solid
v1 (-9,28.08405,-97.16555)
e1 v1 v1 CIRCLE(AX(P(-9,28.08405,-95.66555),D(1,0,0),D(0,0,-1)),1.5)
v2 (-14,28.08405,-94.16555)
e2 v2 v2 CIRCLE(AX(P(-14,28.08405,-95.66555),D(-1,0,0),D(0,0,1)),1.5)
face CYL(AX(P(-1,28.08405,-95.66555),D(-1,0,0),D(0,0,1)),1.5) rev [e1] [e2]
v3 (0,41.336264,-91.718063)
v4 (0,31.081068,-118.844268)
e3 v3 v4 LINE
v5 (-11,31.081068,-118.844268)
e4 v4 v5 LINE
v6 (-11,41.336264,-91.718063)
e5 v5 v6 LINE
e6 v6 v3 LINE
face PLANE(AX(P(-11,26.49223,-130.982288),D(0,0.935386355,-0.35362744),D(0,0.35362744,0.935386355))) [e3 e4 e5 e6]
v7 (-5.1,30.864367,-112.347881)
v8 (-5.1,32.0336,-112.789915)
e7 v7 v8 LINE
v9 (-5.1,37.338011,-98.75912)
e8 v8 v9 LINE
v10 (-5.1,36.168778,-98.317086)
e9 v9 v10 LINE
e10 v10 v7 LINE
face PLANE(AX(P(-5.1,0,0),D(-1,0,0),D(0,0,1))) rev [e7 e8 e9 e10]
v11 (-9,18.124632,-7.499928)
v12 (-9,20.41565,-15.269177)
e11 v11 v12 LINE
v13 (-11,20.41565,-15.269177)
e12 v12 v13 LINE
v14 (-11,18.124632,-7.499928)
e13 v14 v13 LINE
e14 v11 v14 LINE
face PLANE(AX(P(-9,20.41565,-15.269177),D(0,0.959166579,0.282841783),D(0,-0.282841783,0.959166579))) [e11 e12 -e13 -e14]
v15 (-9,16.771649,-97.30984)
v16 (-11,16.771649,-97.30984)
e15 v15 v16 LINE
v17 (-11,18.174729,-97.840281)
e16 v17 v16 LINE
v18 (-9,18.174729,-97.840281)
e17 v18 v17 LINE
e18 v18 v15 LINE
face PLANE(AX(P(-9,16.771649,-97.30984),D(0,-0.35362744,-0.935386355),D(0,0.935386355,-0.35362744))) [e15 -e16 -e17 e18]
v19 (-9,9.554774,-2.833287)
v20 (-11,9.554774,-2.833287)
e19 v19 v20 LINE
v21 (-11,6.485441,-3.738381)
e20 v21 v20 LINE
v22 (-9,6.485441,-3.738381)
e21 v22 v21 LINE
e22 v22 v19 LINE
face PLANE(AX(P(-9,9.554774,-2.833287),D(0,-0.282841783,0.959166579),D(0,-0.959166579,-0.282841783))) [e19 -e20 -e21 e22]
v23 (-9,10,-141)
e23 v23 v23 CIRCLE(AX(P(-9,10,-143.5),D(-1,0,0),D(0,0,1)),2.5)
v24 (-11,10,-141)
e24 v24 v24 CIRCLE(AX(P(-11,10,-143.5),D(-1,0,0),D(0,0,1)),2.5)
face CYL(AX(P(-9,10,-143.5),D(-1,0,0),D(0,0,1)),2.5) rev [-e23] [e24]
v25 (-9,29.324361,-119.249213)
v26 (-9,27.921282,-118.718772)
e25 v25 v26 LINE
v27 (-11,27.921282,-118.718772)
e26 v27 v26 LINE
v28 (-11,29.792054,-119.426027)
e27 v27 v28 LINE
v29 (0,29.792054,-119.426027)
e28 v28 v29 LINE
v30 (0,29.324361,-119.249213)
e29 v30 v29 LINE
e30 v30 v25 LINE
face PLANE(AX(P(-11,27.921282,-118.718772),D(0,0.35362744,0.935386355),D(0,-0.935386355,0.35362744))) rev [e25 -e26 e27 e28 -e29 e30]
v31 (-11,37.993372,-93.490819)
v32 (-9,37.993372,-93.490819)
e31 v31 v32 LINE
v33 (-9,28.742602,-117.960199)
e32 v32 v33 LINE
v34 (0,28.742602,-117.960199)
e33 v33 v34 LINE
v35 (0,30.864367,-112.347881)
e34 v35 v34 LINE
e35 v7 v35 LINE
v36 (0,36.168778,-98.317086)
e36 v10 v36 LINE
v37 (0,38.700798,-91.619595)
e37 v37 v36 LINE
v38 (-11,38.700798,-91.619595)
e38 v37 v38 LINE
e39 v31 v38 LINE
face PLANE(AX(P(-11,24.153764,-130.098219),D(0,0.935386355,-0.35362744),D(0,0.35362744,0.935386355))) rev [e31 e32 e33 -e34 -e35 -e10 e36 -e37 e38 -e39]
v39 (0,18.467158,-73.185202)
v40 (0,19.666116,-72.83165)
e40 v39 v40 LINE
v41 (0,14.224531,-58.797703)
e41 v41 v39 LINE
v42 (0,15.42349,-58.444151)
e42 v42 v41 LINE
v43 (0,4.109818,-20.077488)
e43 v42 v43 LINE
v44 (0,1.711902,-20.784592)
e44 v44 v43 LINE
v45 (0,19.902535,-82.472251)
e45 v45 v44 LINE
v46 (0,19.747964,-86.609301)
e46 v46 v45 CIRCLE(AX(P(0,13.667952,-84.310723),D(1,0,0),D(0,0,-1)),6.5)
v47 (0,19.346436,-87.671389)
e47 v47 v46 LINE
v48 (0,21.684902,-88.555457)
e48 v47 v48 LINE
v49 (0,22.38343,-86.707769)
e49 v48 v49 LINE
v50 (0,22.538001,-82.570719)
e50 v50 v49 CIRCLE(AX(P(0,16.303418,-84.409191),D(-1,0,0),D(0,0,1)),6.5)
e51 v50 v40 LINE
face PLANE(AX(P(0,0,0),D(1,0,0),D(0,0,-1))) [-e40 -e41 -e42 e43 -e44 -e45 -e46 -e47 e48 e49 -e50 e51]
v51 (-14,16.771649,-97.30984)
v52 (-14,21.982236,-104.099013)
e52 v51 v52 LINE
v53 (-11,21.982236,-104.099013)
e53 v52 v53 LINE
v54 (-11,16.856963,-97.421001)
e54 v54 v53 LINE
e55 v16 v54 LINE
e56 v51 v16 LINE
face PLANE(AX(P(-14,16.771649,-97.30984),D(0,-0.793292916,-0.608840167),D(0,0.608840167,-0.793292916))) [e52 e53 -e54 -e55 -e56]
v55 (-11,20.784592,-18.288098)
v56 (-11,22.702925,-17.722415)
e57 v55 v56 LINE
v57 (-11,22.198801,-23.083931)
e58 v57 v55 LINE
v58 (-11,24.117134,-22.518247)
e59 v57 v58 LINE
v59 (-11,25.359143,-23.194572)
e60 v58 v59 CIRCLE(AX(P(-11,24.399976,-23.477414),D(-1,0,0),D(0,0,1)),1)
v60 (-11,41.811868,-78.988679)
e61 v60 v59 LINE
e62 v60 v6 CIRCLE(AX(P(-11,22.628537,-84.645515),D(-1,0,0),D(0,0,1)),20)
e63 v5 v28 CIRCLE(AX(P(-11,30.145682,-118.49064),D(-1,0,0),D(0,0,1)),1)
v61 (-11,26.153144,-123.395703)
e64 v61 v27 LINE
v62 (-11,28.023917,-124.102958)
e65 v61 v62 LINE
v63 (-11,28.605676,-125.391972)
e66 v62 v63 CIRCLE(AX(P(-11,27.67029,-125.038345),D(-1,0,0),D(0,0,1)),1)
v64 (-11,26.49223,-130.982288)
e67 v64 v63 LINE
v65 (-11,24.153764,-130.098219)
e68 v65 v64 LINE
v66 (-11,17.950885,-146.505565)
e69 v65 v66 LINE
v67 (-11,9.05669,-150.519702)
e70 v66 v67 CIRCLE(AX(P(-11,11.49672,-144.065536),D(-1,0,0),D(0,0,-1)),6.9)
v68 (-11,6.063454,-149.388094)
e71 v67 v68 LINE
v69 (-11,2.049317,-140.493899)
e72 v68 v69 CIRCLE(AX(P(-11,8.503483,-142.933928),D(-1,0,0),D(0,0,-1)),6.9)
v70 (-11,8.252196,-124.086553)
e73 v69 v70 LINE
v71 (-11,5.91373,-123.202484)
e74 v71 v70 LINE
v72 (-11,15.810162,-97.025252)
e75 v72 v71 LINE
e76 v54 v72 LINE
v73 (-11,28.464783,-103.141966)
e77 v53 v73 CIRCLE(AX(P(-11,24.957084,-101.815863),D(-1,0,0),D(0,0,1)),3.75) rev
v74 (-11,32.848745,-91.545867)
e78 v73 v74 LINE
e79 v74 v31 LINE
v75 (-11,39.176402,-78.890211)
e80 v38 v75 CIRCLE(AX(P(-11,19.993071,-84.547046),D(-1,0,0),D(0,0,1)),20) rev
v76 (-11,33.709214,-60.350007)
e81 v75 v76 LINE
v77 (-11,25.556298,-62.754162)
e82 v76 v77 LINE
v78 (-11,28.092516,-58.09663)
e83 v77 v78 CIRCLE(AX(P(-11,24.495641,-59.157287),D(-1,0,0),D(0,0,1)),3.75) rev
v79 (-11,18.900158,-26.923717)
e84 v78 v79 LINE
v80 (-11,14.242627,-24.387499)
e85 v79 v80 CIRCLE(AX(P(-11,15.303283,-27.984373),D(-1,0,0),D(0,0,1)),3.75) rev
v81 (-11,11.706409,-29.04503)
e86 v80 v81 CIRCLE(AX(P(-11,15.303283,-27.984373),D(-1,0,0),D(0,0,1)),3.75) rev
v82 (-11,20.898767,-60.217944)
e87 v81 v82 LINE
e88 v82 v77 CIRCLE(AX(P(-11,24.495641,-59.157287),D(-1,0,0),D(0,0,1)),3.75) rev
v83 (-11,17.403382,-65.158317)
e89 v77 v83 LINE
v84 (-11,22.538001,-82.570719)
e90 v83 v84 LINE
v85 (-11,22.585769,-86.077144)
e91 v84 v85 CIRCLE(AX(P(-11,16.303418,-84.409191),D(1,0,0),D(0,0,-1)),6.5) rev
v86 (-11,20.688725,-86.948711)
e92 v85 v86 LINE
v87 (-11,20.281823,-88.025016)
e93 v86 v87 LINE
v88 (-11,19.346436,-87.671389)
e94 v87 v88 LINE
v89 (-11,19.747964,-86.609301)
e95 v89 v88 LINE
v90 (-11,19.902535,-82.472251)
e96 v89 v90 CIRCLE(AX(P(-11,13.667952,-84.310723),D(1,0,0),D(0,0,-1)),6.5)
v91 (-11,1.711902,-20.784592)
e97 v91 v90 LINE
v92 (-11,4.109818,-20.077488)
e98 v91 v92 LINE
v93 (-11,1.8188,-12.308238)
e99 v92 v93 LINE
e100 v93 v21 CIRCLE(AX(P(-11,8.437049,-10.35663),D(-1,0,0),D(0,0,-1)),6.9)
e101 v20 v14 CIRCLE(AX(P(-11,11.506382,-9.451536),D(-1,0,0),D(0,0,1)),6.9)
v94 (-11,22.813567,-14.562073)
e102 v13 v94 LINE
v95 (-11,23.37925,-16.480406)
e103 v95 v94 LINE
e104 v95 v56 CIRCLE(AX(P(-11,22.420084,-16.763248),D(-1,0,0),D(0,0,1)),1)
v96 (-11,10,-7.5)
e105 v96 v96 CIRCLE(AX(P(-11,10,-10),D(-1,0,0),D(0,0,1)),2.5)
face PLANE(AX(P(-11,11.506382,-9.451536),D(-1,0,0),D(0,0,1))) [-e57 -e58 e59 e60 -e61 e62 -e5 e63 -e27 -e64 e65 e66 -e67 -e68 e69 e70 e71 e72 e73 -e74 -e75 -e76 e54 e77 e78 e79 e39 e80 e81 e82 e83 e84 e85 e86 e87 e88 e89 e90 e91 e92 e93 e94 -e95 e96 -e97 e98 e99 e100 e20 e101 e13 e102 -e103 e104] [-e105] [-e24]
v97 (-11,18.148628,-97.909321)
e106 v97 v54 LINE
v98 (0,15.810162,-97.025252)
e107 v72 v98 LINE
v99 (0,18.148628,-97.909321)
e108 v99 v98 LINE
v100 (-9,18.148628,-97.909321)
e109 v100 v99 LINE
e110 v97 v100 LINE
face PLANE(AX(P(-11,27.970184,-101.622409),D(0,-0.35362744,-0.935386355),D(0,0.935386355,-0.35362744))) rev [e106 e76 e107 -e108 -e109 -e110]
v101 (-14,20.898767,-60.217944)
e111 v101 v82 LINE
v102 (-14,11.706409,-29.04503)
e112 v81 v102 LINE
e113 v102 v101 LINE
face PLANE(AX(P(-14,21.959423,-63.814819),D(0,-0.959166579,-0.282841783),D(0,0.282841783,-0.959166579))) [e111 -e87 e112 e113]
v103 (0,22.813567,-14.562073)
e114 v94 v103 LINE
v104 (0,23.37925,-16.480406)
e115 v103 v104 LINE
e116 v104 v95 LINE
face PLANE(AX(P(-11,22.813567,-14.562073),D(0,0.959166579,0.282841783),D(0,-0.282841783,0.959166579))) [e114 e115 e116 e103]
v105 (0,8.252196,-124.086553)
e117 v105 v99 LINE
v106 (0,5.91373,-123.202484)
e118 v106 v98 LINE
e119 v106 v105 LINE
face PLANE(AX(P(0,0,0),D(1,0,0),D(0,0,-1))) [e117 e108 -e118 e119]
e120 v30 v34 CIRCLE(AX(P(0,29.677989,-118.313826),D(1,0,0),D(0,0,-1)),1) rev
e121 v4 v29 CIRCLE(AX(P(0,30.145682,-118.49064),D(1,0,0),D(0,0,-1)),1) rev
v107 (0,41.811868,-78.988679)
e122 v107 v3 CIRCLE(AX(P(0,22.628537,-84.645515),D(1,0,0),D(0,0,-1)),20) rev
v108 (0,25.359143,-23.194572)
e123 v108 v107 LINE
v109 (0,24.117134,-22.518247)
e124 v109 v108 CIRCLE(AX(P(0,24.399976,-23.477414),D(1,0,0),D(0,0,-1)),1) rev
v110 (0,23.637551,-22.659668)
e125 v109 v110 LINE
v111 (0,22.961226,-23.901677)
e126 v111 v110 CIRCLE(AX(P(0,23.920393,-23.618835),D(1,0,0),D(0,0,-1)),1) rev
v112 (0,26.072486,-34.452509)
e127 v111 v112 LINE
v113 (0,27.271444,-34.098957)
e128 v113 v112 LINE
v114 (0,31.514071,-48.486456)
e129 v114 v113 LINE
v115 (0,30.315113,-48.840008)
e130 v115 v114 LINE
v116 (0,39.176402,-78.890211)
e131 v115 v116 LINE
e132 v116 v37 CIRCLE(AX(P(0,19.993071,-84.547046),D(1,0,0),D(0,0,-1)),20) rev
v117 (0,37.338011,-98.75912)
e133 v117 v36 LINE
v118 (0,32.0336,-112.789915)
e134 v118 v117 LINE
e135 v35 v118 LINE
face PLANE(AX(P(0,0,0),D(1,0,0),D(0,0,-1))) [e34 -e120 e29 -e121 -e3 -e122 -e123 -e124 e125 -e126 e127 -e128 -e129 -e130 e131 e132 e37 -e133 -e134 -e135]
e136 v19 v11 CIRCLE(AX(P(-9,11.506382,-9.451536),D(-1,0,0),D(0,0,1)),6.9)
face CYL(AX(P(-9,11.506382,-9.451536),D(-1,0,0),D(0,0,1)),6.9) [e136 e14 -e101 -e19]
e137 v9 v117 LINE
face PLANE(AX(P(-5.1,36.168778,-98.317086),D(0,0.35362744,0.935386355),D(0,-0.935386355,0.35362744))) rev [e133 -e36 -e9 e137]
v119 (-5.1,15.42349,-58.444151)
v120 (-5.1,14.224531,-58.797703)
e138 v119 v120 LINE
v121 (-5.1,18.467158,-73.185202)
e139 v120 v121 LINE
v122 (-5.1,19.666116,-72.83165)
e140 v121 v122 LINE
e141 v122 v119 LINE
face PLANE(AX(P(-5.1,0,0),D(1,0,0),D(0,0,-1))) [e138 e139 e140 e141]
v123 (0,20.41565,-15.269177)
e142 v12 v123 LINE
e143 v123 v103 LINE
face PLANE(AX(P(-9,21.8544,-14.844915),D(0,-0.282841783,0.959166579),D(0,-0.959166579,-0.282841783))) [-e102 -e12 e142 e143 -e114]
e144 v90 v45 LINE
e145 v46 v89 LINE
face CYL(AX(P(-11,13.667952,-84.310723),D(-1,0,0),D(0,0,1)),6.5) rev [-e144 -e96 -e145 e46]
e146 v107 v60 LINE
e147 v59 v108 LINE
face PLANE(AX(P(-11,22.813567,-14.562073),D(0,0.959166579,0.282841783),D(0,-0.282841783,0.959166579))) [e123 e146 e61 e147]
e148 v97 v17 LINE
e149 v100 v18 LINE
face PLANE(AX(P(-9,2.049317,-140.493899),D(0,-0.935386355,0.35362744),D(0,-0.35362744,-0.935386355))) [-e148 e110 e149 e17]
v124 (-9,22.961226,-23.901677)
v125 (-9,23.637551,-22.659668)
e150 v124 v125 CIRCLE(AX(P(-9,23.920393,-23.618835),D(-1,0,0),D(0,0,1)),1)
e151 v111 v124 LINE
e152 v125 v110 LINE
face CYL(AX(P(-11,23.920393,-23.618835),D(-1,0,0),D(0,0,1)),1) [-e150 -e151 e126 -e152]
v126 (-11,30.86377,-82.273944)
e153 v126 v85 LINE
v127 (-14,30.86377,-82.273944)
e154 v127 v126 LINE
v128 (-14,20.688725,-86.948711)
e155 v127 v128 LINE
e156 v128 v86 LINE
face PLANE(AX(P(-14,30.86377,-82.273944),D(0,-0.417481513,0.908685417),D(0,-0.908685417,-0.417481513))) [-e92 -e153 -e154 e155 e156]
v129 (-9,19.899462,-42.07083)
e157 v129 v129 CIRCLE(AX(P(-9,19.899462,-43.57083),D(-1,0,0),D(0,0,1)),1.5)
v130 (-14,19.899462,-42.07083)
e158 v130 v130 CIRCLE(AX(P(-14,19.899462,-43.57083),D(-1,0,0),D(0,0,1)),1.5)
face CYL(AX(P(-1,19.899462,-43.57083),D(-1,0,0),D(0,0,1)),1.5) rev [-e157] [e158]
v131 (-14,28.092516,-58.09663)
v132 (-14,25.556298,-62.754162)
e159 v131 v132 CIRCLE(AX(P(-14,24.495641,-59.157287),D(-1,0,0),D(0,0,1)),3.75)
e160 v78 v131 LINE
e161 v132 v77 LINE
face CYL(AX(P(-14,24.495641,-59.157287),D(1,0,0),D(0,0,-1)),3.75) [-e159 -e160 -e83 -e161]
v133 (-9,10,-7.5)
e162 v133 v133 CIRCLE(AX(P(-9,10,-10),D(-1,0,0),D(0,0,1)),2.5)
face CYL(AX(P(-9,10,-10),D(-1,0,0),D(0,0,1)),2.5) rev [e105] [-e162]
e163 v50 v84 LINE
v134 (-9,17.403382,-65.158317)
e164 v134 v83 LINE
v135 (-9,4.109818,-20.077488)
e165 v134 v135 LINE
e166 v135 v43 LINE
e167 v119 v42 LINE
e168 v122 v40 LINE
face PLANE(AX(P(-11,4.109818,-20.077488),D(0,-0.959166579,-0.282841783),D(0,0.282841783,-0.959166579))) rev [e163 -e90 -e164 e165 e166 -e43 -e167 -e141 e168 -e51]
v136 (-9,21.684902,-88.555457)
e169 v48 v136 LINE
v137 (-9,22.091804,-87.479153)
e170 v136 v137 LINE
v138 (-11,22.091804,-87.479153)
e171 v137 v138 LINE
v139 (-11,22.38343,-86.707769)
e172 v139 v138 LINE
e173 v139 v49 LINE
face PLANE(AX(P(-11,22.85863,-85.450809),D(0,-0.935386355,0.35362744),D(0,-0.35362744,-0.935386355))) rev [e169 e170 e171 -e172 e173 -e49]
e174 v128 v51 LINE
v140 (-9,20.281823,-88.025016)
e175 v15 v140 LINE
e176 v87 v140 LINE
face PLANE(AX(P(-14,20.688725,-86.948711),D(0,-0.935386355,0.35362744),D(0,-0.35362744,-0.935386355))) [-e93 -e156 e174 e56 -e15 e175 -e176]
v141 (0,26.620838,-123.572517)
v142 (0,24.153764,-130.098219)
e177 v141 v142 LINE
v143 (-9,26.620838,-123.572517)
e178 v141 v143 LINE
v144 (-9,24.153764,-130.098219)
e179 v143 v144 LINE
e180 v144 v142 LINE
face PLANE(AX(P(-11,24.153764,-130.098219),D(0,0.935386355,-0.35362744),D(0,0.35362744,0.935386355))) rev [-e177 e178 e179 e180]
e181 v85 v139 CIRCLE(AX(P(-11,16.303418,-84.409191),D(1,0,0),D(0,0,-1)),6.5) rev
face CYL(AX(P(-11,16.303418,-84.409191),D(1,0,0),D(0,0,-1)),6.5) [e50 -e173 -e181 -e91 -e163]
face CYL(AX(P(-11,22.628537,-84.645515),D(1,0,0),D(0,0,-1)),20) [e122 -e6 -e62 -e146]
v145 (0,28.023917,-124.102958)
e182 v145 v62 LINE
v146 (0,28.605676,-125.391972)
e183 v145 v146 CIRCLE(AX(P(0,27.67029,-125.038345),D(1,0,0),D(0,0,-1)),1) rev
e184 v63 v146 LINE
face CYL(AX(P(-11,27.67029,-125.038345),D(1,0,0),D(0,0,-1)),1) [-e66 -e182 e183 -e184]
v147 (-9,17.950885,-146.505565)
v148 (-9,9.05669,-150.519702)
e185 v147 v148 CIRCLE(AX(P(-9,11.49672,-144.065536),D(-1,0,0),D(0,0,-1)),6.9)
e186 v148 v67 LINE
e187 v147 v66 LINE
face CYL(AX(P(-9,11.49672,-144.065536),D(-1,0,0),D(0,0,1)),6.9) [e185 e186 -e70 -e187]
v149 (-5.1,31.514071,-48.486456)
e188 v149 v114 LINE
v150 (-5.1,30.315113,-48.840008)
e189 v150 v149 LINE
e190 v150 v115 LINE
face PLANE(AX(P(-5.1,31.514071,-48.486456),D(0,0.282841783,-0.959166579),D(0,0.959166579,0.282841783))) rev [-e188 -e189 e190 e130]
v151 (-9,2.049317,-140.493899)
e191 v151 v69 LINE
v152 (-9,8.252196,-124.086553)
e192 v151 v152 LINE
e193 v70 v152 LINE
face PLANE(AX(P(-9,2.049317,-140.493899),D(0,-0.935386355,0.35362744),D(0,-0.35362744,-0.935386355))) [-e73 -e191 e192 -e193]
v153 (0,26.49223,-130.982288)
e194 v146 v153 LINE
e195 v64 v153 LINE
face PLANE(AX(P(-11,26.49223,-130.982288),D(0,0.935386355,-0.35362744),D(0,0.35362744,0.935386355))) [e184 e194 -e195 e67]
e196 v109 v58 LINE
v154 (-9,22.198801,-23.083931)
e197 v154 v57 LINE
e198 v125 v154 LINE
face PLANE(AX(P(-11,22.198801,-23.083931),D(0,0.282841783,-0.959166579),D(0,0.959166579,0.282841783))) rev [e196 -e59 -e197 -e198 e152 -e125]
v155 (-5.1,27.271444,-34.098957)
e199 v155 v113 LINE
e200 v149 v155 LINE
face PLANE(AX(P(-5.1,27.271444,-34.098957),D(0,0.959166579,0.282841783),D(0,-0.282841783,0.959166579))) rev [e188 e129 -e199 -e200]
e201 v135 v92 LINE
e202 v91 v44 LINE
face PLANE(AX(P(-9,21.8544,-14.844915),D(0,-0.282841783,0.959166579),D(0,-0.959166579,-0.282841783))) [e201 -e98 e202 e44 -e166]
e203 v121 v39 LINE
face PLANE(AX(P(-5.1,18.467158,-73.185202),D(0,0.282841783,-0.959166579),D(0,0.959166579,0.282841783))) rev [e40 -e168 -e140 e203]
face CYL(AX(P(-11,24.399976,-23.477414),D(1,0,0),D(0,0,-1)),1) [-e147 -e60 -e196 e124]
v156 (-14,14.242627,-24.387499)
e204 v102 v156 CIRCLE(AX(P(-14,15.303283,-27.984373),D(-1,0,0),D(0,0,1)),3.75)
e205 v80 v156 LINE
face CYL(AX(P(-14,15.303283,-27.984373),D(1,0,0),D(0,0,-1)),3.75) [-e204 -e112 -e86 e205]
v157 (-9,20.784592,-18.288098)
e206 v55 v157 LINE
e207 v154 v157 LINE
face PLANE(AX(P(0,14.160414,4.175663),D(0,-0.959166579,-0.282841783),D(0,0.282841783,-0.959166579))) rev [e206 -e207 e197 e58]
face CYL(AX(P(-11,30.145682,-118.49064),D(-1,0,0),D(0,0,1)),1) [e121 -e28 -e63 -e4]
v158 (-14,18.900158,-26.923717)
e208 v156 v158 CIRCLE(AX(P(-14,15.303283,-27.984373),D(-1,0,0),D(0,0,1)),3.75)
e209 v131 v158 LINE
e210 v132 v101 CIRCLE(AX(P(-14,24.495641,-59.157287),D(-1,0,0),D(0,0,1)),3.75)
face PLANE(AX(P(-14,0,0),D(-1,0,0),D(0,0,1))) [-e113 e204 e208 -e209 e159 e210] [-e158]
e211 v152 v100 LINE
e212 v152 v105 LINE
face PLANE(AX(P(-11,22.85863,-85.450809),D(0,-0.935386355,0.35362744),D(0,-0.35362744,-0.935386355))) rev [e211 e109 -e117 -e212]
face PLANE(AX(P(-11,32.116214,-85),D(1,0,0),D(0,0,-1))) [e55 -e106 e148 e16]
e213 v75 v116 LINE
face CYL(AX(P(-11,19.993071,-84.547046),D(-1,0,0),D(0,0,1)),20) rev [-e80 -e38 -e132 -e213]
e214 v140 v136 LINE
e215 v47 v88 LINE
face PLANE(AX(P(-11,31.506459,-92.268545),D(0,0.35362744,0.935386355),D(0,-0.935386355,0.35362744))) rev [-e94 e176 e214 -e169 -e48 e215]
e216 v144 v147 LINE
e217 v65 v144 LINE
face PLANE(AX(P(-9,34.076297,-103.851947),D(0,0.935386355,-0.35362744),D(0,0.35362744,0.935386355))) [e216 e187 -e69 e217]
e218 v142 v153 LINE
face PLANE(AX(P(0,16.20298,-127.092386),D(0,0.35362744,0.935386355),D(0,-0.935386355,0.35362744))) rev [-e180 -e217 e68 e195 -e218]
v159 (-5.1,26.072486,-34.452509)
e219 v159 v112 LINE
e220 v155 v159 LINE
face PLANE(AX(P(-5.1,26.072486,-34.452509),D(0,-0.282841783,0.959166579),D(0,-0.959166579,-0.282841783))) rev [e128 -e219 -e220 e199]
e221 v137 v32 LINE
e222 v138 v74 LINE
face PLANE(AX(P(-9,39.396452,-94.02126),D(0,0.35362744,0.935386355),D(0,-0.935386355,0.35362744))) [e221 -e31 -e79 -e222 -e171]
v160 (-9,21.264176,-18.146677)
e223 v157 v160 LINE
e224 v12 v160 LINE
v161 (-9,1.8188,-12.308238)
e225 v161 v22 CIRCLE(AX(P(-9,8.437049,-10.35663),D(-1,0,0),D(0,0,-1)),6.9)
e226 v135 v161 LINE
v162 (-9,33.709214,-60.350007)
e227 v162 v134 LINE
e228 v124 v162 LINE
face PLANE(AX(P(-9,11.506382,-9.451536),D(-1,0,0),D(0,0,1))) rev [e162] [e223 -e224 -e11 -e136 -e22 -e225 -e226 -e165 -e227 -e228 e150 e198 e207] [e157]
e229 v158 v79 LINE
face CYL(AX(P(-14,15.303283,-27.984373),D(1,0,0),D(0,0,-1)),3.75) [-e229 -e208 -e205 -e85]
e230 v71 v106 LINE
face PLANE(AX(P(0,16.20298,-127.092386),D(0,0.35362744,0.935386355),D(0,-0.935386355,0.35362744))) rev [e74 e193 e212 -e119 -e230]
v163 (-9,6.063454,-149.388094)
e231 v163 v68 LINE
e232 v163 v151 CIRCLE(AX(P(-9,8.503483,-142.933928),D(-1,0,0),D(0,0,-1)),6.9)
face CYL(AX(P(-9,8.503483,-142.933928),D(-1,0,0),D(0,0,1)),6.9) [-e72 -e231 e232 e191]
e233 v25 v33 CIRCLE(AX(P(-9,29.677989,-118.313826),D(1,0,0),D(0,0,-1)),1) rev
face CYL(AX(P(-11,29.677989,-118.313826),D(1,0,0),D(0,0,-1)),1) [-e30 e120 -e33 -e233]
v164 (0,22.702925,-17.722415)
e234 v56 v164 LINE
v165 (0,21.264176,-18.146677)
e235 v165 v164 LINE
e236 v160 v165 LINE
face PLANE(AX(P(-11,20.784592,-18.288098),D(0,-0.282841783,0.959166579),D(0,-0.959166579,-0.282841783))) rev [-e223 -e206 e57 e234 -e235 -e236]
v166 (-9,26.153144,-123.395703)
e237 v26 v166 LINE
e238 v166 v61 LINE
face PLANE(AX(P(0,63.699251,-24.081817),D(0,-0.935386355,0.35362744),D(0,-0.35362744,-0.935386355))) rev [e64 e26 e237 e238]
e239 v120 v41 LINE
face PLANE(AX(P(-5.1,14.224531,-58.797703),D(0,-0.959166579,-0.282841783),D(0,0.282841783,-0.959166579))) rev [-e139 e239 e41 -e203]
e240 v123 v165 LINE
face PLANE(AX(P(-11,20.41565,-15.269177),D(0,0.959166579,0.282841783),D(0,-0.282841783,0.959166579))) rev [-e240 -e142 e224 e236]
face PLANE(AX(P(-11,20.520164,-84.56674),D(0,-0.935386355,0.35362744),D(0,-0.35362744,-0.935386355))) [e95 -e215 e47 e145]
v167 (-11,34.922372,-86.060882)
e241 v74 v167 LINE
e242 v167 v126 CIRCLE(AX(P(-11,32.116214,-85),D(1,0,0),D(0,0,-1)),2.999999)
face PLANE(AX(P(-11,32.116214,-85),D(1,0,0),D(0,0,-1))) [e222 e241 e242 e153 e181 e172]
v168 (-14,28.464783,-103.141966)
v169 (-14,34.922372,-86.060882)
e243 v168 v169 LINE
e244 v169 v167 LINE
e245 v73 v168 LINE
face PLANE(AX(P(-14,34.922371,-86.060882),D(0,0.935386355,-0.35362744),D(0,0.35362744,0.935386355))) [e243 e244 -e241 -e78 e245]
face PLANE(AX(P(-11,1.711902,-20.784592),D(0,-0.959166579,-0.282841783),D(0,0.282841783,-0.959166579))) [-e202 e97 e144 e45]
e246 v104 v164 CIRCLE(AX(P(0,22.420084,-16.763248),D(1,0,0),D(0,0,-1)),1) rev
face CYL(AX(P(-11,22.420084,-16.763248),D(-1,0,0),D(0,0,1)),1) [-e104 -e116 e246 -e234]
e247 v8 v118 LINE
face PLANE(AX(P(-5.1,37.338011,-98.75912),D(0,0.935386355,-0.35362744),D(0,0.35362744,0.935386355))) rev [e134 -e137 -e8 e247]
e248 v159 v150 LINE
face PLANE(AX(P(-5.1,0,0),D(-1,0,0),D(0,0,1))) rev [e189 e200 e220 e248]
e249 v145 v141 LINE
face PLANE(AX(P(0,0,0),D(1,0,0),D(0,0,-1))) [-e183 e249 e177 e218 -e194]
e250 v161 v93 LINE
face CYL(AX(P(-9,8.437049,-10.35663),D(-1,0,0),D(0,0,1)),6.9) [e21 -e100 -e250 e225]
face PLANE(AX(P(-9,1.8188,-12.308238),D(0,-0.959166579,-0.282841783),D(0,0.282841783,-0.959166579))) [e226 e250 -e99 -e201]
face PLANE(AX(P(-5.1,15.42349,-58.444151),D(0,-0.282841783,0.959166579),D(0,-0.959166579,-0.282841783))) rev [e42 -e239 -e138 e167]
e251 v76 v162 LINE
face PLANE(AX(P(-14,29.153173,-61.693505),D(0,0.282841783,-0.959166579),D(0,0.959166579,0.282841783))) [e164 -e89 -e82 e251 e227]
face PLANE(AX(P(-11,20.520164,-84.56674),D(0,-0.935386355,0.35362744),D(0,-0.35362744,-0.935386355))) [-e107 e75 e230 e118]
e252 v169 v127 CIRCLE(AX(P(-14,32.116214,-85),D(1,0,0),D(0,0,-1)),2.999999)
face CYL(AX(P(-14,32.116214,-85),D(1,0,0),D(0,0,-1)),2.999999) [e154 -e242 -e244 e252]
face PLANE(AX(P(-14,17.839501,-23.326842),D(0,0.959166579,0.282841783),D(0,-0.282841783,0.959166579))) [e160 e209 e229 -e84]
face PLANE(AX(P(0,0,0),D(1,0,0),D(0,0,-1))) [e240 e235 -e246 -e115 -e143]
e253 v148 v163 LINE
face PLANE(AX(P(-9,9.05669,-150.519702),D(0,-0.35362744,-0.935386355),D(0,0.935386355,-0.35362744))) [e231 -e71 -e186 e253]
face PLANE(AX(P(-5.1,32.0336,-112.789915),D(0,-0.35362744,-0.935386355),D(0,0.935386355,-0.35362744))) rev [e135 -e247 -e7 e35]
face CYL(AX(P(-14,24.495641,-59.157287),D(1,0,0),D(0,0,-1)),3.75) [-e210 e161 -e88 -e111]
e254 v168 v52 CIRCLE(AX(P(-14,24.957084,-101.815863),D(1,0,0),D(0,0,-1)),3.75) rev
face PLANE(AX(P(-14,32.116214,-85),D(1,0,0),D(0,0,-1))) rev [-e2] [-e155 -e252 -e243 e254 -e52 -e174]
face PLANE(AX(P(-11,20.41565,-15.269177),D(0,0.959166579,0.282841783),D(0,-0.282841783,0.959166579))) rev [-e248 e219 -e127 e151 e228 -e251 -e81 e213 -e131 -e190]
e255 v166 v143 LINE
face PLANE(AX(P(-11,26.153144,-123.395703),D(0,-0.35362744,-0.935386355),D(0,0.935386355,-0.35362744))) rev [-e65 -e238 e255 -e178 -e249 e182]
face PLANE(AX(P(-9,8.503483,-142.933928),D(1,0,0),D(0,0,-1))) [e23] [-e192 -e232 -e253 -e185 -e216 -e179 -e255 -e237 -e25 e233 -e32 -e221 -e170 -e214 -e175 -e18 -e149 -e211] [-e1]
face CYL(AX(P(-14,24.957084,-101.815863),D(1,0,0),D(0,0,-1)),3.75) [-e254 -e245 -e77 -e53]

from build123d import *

# Parameters (mm, degrees)
SWEEP1_PROFILE_R        = 11
CUT_EXTRUDE1_DEPTH      = 139.5211963076765
CUT_EXTRUDE1_DEPTH_BACK = 139.5211963076765
BOSS_EXTRUDE1_DEPTH     = 11
BOSS_EXTRUDE4_DEPTH     = 11
SHELL1_START            = -11
SHELL1_DEPTH            = 11
SHELL1_START_2          = -113.150665538
SHELL1_2_DEPTH          = 47.855548818
SHELL1_START_3          = 20.420083618
SHELL1_3_DEPTH          = 73.048431747
FILLET1_R               = 6.5
BOSS_EXTRUDE2_DEPTH     = 3
CUT_EXTRUDE2_DEPTH      = 13.000000000000002
SKETCH21_R              = 2.499999999999935
SKETCH21_R_2            = 2.499999999999995
BOSS_EXTRUDE3_DEPTH     = 2
SKETCH22_R              = 1.4999999999999973
SKETCH22_R_2            = 1.5000000000000042
CUT_EXTRUDE3_DEPTH      = 13.000000000000002
FILLET2_R               = 3.75
CUT_EXTRUDE4_DEPTH      = 3
FILLET3_R               = 20
CUT_EXTRUDE5_DEPTH      = 3
FILLET4_R               = 1
CUT_EXTRUDE6_DEPTH      = 158.49217492446147
CUT_EXTRUDE7_DEPTH      = 5.1


with BuildPart() as part:
    # Sweep1: sweep along a path in Sketch6
    with BuildLine(Plane(origin=(0, 0, 0), x_dir=(0, 0, -1), z_dir=(1, 0, 0))) as sweep1_path:
        Line((17.67333262983066, 12.262734264551655), (84.99999999999999, 32.11621443102775))
        Line((84.99999999999999, 32.11621443102775), (127.09238599616681, 16.202979651458282))
    # Sweep1 profile (on start of the path) → Sweep1 (sweep)
    with BuildSketch(Plane(origin=(0, 12.262734264551655, -17.67333262983066), x_dir=(0, -0.9591665787285488, -0.28284178306991825), z_dir=(0, 0.28284178306991825, -0.9591665787285488))):
        Circle(SWEEP1_PROFILE_R)
    sweep(path=sweep1_path.line, transition=Transition.RIGHT)

    # Sketch13 → Cut-Extrude1 (cut, two sides: drawn at the far end of the back side and taken through both)
    with BuildSketch(Plane(origin=(0, 0, 0), x_dir=(1, 0, 0), z_dir=(0, 1, 0)).offset(-CUT_EXTRUDE1_DEPTH_BACK)):
        Polygon((-1.735e-14, 141.7207506217034), (-10.000000000000018, 141.7207506217034), (-10, -2.41e-15), (0, -1.18e-15), align=None)
    extrude(amount=CUT_EXTRUDE1_DEPTH + CUT_EXTRUDE1_DEPTH_BACK, mode=Mode.SUBTRACT)


with BuildPart() as cut_extrude1_piece_1:
    # of the separate pieces the step leaves, piece 1, a body of its own (cut_extrude1_pieces)
    add(part.part.solids().sort_by_distance((0, 22.813566631, -14.562073016))[0])



with BuildPart() as cut_extrude1_piece_2:
    # of the separate pieces the step leaves, piece 2, a body of its own (cut_extrude1_pieces)
    add(part.part.solids().sort_by_distance((-10, 7.867280813, -18.96947651))[0])


with BuildPart() as cut_extrude1_piece_1_1:
    add(cut_extrude1_piece_1.part)

    add(cut_extrude1_piece_2.part)  # Boss-Extrude1 merges Cut-Extrude1 piece 2
    # Sketch17 → Boss-Extrude1 (add)
    with BuildSketch(Plane(origin=(0, 0, 0), x_dir=(0, 0, -1), z_dir=(1, 0, 0))):
        Polygon((14.562073016061587, 22.813566630565735), (85.43326002077312, 43.71226488094253), (130.98228783117273, 26.4922295616324), (123.20248416116098, 5.91372974128417), (84.56673997922682, 20.52016398111302), (20.78459224359979, 1.7119018985376593), align=None)
    extrude(amount=-BOSS_EXTRUDE1_DEPTH)

    # Sketch24 → Boss-Extrude4 (add)
    with BuildSketch(Plane(origin=(0, 0, 0), x_dir=(0, 0, -1), z_dir=(1, 0, 0))):
        Polygon((127.09238599616687, 16.20297965145829), (84.99999999999997, 32.11621443102777), (17.673332629830696, 12.2627342645517), (14.5620730160616, 22.813566630565738), (85.43326002077312, 43.71226488094253), (130.98228783117273, 26.4922295616324), align=None)
    extrude(amount=BOSS_EXTRUDE4_DEPTH)

    # Shell1: read off the stored shape, not the designer's step
    # Shell1 outline → Shell1 (cut)
    with BuildSketch(Plane.YZ.offset(SHELL1_START)):
        Polygon((4.109818345, -20.077487786), (23.155629992, -84.665208166), (8.25219563, -124.08655276), (24.153763673, -130.098219232), (41.07679887, -85.334791834), (20.415650184, -15.269177474), align=None)
    extrude(amount=SHELL1_DEPTH, mode=Mode.SUBTRACT)

    # Shell1 2 outline → Shell1 2 (cut)
    with BuildSketch(Plane(origin=(0, 0, 0), x_dir=(1, 0, 0), z_dir=(0, 0.353627439545988, 0.935386355470374)).offset(SHELL1_START_2)):
        with BuildLine():
            ThreePointArc((0, 51.59940113), (6.01040764, 54.088993489), (8.5, 60.09940113))
            Line((8.5, 60.09940113), (8.5, 68.59940113))
            Line((8.5, 68.59940113), (0, 68.59940113))
            Line((0, 68.59940113), (0, 51.59940113))
        make_face()
    extrude(amount=SHELL1_2_DEPTH, mode=Mode.SUBTRACT)

    # Shell1 3 outline → Shell1 3 (cut)
    with BuildSketch(Plane(origin=(0, 0, 0), x_dir=(1, 0, 0), z_dir=(0, 0.2828417830699179, -0.9591665787285488)).offset(SHELL1_START_3)):
        with BuildLine():
            Line((8.5, -15.263247957), (8.5, -6.763247957))
            ThreePointArc((8.5, -6.763247957), (6.01040764, -0.752840317), (0, 1.736752043))
            Line((0, 1.736752043), (0, -15.263247957))
            Line((0, -15.263247957), (8.5, -15.263247957))
        make_face()
    extrude(amount=SHELL1_3_DEPTH, mode=Mode.SUBTRACT)

    # Fillet1
    fillet1_edges = [cut_extrude1_piece_1_1.edges().sort_by_distance(p)[0] for p in [
        (7.881335387835811, 24.026781093815067, -84.69775674305134),
        (6.090122796410721, 25.865288676138242, -84.76644839135132),
        (-5.5, 23.155629992, -84.665208166),
        (-5.5, 20.52016398111302, -84.56673997922682),
    ]]
    fillet(fillet1_edges, radius=FILLET1_R)

    # Sketch19 → Boss-Extrude2 (add)
    with BuildSketch(Plane(origin=(-11, 0, 0), x_dir=(0, 0, -1), z_dir=(1, 0, 0))):
        Polygon((23.326841994418306, 17.839501416273155), (61.69350514356026, 29.153172739069877), (63.814818516584644, 21.959423398605768), (25.44815536744269, 10.645752075809039), align=None)
        with BuildLine():
            Line((82.27394375020691, 30.863769892150234), (86.9487114072542, 20.688724856427108))
            Line((86.9487114072542, 20.688724856427108), (97.3098397387939, 16.771649028602706))
            Line((97.3098397387939, 16.771649028602706), (109.44211139391379, 26.082981771484846))
            Line((109.44211139391379, 26.082981771484846), (86.06088152658778, 34.92237140237257))
            ThreePointArc((86.06088152658778, 34.92237140237257), (82.80654161714303, 34.162852377504095), (82.27394375020691, 30.863769892150234))
        make_face()
    extrude(amount=-BOSS_EXTRUDE2_DEPTH)


with BuildPart() as boss_extrude2_piece_1:
    # of the separate pieces the step leaves, piece 1, a body of its own (boss_extrude2_pieces)
    add(cut_extrude1_piece_1_1.part.solids().sort_by_distance((-1e-09, 22.538001125, -82.570719291))[0])

    # Sketch20 → Cut-Extrude2 (cut)
    with BuildSketch(Plane(origin=(0, 45.92690987835062, -17.362895504685262), x_dir=(1, 0, 0), z_dir=(0, -0.9353863554703739, 0.3536274395459883))):
        Polygon((-11.00000000000001, -75.16519001409192), (3.999999999999988, -75.16519001409192), (3.9999999999999916, -85.1651900140919), (-11.00000000000001, -85.1651900140919), align=None)
    extrude(amount=-CUT_EXTRUDE2_DEPTH, mode=Mode.SUBTRACT)



with BuildPart() as boss_extrude2_piece_2:
    # of the separate pieces the step leaves, piece 2, a body of its own (boss_extrude2_pieces)
    add(cut_extrude1_piece_1_1.part.solids().sort_by_distance((-11, 17.839501416, -23.326841994))[0])


with BuildPart() as boss_extrude2_piece_1_1:
    add(boss_extrude2_piece_1.part)

    add(boss_extrude2_piece_2.part)  # Boss-Extrude3 merges Boss-Extrude2 piece 2
    # Sketch21 → Boss-Extrude3 (add)
    # profile 1 of 2: a face of its own
    with BuildSketch(Plane.ZY.offset(11)):
        with BuildLine():
            Line((-59.92574399937327, 35.14796385612329), (-14.844914799131477, 21.85440005183715))
            Line((-14.844914799131477, 21.85440005183715), (-15.269177473736278, 20.4156501837443))
            Line((-15.269177473736278, 20.4156501837443), (-7.49992818603503, 18.124631740877966))
            ThreePointArc((-7.49992818603503, 18.124631740877966), (-3.391731998282636, 14.806195907785265), (-2.833287095990472, 9.554774044468546))
            Line((-2.833287095990472, 9.554774044468546), (-3.738380801814209, 6.4854409925371845))
            ThreePointArc((-3.738380801814209, 6.4854409925371845), (-7.056816634906908, 2.377244804784792), (-12.308238498223627, 1.8187999024926287))
            Line((-12.308238498223627, 1.8187999024926287), (-20.07748778592488, 4.1098183453589545))
            Line((-20.07748778592488, 4.1098183453589545), (-20.501750460529845, 2.6710684772661613))
            Line((-20.501750460529845, 2.6710684772661613), (-65.58257966077163, 15.964632281552323))
            Line((-65.58257966077163, 15.964632281552323), (-59.92574399937327, 35.14796385612329))
        make_face()
        with Locations((-10.000000000002185, 9.999999999992289)):
            Circle(SKETCH21_R, mode=Mode.SUBTRACT)
    # profile 2 of 2: a face of its own
    with BuildSketch(Plane.ZY.offset(11)):
        with BuildLine():
            Line((-97.3098397387939, 16.771649028602706), (-97.8402808981129, 18.1747285618083))
            Line((-97.8402808981129, 18.1747285618083), (-140.4938987075619, 2.049317318511217))
            ThreePointArc((-140.4938987075619, 2.049317318511217), (-145.77235119424373, 2.21433744231316), (-149.3880938931748, 6.0634538383894725))
            Line((-149.3880938931748, 6.0634538383894725), (-150.519701699722, 9.056690175894678))
            ThreePointArc((-150.519701699722, 9.056690175894678), (-150.35468157592004, 14.33514266257649), (-146.50556517984373, 17.95088536150758))
            Line((-146.50556517984373, 17.95088536150758), (-103.85194737039468, 34.07629660480464))
            Line((-103.85194737039468, 34.07629660480464), (-104.38238852971367, 35.479376138010196))
            Line((-104.38238852971367, 35.479376138010196), (-94.02126019817398, 39.39645196583461))
            Line((-94.02126019817398, 39.39645196583461), (-86.9487114072542, 20.688724856427108))
            Line((-86.9487114072542, 20.688724856427108), (-97.3098397387939, 16.771649028602706))
        make_face()
        with Locations((-143.4999999999837, 10.000000000006171)):
            Circle(SKETCH21_R_2, mode=Mode.SUBTRACT)
    extrude(amount=-BOSS_EXTRUDE3_DEPTH)

    # Sketch22 → Cut-Extrude3 (cut)
    with BuildSketch(Plane.ZY.offset(13.999999999999998)):
        with Locations((-95.66554996848392, 28.084050497218655)):
            Circle(SKETCH22_R)
        with Locations((-43.57083025550148, 19.89946240743944)):
            Circle(SKETCH22_R_2)
    extrude(amount=-CUT_EXTRUDE3_DEPTH, mode=Mode.SUBTRACT)

    # Fillet2
    fillet2_edges = [boss_extrude2_piece_1_1.edges().sort_by_distance(p)[0] for p in [
        (-12.5, 10.645752075809039, -25.44815536744269),
        (-12.5, 17.839501416273155, -23.326841994418306),
        (-12.5, 21.959423398605768, -63.814818516584644),
        (-12.5, 29.153172739069877, -61.69350514356026),
        (-12.5, 26.082981771484846, -109.44211139391379),
    ]]
    fillet(fillet2_edges, radius=FILLET2_R - 0.0001)  # a hair under: the kernel refuses the full size

    # Sketch23 → Cut-Extrude4 (cut)
    with BuildSketch(Plane(origin=(0, 17.03791376961812, 5.024188725151693), x_dir=(1, 0, 0), z_dir=(0, 0.9591665787285488, 0.28284178306991814))):
        Polygon((-11, 23.42008361798458), (8, 23.42008361798471), (8, 28.420083617984712), (-11, 28.420083617984712), align=None)
    extrude(amount=-CUT_EXTRUDE4_DEPTH, mode=Mode.SUBTRACT)

    # Fillet3
    fillet3_edges = [boss_extrude2_piece_1_1.edges().sort_by_distance(p)[0] for p in [
        (0, 43.71226488094253, -85.43326002077312),
        (-5.5, 41.07679887, -85.334791834),
    ]]
    fillet(fillet3_edges, radius=FILLET3_R)

    # Sketch25 → Cut-Extrude5 (cut)
    with BuildSketch(Plane(origin=(0, 66.50540969869883, -25.142699174696986), x_dir=(1, 0, 0), z_dir=(0, 0.9353863554703739, -0.3536274395459882))):
        Polygon((-11, 101.17418781590268), (8, 101.17418781590271), (8, 106.17418781590271), (-11, 106.17418781590268), align=None)
    extrude(amount=-CUT_EXTRUDE5_DEPTH, mode=Mode.SUBTRACT)

    # Fillet4
    fillet4_edges = [boss_extrude2_piece_1_1.edges().sort_by_distance(p)[0] for p in [
        (-4.5, 22.678384448496875, -22.942510103507807),
        (-1.5, 23.66209197977548, -17.439572752247173),
        (8, 24.36919643745029, -19.837489199068607),
        (-1.5, 25.076300895125087, -22.235405645889983),
        (-4.5, 28.388974824561164, -118.89558538463223),
        (-1.5, 30.72744071321624, -119.77965398348931),
        (8, 29.84337211435127, -122.11811987216527),
        (-1.5, 28.959303515486297, -124.45658576084118),
    ]]
    fillet(fillet4_edges, radius=FILLET4_R)

    # Sketch26 → Cut-Extrude6 (cut, through all)
    with BuildSketch(Plane(origin=(0, 0, 0), x_dir=(0, 0, -1), z_dir=(1, 0, 0))):
        Polygon((-14.446633314427679, 64.99999999999999), (165.5533666855723, 65.00000000000001), (165.55336668557234, -24.99999999999997), (-14.446633314427677, -25.000000000000004), align=None)
    extrude(amount=CUT_EXTRUDE6_DEPTH, mode=Mode.SUBTRACT)

    # Sketch27 → Cut-Extrude7 (cut)
    with BuildSketch(Plane(origin=(0, 0, 0), x_dir=(0, 0, -1), z_dir=(1, 0, 0))):
        Polygon((34.45250904830736, 26.07248584514273), (34.09895681946996, 27.271444068553414), (48.486455500398186, 31.514070814602224), (48.840007729235595, 30.315112591191493), align=None)
        Polygon((58.44415093506696, 15.423489668155758), (58.79770316390435, 14.224531444745072), (73.1852018448326, 18.46715819079385), (72.8316496159952, 19.66611641420453), align=None)
        Polygon((98.3170855642761, 36.16877849455206), (98.75911986370858, 37.33801143889003), (112.78991519576418, 32.03359984570021), (112.34788089633173, 30.864366901362228), align=None)
    extrude(amount=-CUT_EXTRUDE7_DEPTH, mode=Mode.SUBTRACT)


solid = boss_extrude2_piece_1_1.part
